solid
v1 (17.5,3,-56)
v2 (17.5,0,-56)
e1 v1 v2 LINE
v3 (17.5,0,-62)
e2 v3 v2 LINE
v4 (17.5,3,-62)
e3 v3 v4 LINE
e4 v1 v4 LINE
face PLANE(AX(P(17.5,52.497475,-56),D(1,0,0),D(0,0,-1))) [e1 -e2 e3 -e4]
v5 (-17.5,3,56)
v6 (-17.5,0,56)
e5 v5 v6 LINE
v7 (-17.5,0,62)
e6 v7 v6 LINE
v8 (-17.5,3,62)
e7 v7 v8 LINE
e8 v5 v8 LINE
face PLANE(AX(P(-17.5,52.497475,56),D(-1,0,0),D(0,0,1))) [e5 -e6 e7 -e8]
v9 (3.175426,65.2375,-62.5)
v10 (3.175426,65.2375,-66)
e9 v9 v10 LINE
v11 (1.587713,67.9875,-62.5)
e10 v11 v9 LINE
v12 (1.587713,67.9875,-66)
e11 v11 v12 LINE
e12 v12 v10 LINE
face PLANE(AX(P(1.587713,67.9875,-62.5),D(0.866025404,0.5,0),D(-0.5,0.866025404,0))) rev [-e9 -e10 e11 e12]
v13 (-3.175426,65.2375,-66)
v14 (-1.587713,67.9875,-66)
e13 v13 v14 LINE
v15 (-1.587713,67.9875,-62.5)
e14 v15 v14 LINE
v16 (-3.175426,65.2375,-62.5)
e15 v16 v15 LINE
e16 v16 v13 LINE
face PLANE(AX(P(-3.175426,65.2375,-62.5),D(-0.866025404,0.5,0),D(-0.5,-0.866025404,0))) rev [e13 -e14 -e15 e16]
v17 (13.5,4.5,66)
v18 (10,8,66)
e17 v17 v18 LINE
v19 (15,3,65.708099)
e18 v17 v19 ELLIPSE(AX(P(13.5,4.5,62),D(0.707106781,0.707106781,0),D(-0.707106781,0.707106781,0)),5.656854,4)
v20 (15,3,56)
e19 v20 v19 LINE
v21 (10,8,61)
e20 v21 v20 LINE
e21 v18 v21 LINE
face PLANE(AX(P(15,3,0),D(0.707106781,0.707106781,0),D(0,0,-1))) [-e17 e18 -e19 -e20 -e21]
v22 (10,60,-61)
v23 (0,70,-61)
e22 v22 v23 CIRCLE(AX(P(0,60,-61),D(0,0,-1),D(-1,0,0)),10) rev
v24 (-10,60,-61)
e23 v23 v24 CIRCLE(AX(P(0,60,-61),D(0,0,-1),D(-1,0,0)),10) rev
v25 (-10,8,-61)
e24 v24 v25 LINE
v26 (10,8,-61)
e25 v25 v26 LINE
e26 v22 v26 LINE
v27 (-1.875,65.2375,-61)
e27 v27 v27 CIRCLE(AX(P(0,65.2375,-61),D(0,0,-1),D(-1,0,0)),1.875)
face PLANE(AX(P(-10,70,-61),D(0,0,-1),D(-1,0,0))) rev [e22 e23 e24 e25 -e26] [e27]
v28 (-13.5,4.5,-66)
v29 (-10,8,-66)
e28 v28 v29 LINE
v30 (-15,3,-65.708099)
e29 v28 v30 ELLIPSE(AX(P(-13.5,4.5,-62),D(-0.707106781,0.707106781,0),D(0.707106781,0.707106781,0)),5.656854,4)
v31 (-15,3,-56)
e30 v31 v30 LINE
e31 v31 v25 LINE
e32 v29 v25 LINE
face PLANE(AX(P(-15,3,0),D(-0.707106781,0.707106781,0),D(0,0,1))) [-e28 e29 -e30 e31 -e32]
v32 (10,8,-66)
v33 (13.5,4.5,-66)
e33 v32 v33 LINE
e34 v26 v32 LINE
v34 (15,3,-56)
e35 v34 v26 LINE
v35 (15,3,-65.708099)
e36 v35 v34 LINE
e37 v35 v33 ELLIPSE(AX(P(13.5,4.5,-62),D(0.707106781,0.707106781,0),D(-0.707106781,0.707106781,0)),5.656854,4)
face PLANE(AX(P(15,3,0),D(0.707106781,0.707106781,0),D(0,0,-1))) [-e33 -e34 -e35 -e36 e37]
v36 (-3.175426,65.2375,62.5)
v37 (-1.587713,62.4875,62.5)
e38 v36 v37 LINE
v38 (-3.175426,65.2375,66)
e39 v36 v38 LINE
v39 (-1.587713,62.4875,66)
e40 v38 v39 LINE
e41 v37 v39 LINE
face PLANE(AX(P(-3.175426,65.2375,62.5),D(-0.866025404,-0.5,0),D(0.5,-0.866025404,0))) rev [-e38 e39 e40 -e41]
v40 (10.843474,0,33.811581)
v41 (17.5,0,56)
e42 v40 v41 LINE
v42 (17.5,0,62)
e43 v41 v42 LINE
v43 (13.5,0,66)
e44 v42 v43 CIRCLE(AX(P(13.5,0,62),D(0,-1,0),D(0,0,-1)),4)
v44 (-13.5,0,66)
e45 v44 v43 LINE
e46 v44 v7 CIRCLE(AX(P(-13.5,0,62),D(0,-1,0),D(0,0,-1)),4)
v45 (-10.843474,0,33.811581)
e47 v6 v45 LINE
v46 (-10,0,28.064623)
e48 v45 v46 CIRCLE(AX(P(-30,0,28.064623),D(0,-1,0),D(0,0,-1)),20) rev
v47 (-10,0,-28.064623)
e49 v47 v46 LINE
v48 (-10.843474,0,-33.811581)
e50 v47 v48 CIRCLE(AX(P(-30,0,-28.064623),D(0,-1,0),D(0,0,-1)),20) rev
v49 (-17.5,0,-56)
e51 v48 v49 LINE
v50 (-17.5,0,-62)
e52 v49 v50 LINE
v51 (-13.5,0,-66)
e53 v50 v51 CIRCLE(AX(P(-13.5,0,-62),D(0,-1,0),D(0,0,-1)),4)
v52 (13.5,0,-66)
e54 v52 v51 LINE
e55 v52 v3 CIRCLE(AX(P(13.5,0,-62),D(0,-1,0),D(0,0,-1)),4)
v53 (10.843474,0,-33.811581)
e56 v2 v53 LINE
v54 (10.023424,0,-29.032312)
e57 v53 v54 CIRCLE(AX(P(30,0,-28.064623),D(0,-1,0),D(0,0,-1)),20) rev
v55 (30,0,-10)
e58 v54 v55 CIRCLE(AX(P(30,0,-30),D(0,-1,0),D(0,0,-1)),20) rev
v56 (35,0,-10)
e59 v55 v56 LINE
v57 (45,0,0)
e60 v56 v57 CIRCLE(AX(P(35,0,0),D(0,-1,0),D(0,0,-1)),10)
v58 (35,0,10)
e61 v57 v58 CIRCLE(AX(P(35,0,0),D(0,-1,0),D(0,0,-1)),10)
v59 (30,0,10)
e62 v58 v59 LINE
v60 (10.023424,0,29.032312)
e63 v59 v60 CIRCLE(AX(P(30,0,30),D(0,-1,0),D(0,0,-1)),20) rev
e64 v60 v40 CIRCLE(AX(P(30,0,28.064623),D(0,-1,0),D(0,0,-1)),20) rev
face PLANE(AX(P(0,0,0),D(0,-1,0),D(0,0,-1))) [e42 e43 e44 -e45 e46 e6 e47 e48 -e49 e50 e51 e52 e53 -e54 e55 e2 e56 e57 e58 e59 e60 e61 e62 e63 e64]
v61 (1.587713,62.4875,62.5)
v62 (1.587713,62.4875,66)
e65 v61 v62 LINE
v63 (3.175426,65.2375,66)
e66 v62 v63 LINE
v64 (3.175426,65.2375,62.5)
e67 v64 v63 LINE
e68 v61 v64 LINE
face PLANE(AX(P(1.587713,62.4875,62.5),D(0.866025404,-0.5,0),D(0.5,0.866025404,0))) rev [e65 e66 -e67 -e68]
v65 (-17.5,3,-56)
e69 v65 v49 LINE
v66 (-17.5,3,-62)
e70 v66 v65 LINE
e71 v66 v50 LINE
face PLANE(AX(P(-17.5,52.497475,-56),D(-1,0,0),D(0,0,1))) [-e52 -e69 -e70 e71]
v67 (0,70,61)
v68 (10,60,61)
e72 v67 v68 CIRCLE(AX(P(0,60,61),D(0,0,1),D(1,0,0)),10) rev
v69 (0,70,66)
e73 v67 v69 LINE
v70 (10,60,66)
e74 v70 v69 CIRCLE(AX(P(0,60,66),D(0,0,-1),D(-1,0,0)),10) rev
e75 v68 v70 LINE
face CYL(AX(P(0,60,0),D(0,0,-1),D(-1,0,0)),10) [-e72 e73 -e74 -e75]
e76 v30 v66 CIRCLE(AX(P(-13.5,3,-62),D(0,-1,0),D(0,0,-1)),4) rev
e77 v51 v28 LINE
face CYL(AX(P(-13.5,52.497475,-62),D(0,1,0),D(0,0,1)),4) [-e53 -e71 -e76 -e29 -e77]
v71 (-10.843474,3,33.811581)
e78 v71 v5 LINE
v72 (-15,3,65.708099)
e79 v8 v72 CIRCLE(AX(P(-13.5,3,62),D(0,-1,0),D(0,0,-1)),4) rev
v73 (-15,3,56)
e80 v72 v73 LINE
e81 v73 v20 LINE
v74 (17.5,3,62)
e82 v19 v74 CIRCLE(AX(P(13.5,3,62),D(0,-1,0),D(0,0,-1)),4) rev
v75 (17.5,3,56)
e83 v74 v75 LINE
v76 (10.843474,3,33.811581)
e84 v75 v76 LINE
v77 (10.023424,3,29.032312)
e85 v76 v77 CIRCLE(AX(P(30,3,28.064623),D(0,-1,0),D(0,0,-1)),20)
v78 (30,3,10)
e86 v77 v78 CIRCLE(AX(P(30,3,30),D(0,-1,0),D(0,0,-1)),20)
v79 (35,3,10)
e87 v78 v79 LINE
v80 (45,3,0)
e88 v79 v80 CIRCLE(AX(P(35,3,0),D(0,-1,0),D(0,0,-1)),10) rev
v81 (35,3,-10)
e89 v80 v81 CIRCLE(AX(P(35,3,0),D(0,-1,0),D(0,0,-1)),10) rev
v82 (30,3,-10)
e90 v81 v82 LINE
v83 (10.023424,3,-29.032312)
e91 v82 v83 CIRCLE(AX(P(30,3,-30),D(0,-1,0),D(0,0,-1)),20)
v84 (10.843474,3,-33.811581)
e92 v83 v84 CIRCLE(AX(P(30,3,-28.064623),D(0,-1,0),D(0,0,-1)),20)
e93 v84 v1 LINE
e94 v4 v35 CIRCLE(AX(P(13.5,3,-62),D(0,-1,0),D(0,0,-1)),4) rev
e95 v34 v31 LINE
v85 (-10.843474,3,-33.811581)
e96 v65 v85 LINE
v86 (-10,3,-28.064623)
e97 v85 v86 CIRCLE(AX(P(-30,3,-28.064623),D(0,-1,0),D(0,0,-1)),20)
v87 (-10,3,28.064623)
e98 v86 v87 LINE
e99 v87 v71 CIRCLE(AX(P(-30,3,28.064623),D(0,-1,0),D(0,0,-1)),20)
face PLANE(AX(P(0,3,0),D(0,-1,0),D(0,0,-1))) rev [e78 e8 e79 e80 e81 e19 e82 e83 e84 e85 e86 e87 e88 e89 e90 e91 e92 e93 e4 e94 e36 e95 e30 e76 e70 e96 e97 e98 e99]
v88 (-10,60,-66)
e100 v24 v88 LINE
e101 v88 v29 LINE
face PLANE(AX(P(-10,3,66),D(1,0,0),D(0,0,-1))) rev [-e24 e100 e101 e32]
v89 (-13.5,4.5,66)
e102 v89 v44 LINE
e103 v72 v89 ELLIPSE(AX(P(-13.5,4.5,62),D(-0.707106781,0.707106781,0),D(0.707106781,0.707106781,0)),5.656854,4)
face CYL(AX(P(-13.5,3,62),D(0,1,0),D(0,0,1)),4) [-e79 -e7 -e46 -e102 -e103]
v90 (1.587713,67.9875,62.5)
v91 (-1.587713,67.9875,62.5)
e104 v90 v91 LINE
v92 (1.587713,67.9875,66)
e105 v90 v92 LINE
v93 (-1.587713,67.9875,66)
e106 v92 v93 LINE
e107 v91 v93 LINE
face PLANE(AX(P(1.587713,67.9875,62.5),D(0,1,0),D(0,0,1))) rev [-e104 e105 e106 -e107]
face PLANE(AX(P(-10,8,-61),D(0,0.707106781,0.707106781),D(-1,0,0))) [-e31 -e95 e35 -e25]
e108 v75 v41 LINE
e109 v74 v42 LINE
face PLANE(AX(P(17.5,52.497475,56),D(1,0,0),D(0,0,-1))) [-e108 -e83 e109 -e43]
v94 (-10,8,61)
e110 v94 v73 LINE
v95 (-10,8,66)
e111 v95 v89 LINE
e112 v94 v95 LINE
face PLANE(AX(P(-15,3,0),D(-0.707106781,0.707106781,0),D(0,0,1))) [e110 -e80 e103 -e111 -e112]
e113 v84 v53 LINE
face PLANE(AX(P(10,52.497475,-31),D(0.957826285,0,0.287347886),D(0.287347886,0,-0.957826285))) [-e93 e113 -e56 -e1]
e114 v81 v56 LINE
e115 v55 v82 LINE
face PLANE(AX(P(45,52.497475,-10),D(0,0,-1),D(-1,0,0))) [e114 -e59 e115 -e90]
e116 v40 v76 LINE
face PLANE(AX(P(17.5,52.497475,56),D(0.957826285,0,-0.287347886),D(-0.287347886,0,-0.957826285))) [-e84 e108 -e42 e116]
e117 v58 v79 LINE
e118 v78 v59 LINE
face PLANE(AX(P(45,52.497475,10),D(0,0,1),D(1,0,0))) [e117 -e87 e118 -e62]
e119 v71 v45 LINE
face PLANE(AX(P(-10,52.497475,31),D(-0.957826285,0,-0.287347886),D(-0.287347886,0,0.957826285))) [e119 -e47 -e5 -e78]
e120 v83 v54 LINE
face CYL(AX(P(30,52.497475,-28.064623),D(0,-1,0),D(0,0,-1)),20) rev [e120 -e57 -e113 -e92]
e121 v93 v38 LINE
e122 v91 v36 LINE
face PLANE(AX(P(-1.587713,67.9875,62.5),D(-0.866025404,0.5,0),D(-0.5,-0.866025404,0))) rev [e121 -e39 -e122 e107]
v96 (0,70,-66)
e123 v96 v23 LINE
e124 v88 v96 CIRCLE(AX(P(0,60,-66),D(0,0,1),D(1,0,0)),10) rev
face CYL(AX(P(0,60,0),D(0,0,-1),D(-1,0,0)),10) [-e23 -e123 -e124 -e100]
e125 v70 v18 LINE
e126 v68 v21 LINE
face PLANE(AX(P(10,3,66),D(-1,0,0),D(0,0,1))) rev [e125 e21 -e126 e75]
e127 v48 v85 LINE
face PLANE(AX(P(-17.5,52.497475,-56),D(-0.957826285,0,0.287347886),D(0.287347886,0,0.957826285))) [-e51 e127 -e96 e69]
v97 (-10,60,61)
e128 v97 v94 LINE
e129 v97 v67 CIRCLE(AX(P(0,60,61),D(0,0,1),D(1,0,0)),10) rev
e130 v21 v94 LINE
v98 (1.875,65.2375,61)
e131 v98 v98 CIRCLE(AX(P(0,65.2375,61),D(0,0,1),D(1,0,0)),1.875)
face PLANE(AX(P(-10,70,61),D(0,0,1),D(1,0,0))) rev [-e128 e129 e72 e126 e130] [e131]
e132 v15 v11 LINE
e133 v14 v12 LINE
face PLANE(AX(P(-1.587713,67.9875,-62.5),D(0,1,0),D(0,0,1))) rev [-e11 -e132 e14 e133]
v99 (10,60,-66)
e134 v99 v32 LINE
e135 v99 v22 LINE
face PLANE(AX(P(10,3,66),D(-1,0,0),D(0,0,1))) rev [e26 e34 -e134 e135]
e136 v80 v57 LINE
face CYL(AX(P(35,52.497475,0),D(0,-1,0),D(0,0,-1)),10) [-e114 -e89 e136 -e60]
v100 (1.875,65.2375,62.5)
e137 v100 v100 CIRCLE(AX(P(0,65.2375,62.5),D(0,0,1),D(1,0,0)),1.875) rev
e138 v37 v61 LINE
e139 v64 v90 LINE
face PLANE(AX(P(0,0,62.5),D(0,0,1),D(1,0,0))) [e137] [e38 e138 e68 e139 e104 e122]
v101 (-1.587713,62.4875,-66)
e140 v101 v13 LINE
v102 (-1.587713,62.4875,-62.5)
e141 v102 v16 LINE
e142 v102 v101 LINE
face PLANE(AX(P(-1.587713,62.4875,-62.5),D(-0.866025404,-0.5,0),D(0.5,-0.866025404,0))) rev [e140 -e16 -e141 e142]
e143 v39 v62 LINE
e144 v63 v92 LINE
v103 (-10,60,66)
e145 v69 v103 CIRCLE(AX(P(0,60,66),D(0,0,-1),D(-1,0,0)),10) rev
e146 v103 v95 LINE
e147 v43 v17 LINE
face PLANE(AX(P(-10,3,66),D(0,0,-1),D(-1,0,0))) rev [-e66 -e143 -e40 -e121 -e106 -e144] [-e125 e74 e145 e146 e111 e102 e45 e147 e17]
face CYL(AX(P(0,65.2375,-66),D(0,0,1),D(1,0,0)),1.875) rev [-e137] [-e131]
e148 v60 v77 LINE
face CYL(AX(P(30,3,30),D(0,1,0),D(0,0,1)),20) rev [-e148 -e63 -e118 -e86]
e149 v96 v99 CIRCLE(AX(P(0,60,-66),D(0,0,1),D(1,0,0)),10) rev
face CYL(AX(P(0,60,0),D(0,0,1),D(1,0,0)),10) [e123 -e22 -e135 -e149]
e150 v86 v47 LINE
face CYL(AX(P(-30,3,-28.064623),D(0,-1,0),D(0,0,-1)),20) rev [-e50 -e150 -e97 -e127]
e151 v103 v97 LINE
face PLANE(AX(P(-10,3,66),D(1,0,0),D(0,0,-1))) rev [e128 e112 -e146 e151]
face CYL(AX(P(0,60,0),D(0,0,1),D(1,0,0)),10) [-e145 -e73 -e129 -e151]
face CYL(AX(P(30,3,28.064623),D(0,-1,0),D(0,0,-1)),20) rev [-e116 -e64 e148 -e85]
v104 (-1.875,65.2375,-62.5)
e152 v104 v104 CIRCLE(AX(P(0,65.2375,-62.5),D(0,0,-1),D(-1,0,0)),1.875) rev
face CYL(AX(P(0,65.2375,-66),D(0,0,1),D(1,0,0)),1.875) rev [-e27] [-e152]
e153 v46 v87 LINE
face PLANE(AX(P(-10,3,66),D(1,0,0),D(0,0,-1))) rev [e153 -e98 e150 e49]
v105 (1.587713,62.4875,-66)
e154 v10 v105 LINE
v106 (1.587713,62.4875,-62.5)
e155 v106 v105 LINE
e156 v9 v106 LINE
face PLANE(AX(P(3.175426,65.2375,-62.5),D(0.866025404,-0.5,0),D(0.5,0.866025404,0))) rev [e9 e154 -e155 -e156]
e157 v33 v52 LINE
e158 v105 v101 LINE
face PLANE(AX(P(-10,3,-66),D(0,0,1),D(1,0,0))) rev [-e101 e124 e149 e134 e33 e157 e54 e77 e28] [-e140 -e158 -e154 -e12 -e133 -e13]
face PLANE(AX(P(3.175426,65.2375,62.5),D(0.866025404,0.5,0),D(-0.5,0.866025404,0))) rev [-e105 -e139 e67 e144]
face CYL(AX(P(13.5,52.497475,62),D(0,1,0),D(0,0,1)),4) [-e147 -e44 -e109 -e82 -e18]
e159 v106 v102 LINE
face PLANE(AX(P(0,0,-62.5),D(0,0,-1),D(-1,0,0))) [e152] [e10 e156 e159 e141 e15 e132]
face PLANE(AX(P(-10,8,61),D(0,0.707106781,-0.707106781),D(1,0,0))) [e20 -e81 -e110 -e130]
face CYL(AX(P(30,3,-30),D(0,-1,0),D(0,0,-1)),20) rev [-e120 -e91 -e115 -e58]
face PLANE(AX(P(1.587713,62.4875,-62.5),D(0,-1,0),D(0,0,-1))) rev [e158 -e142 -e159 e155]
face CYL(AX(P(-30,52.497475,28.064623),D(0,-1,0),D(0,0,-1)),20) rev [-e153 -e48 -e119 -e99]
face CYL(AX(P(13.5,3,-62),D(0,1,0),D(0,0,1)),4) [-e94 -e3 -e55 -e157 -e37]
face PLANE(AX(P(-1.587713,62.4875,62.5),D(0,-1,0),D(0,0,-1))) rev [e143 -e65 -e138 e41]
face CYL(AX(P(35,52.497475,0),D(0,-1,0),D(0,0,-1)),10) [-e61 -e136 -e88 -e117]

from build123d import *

# Parameters (mm, degrees)
SKETCH1_W           = 20
SKETCH1_H           = 132
BOSS_EXTRUDE1_DEPTH = 3
SKETCH2_W           = 20
SKETCH2_H           = 5
BOSS_EXTRUDE2_DEPTH = 67
SKETCH4_R           = 1.875
CUT_EXTRUDE1_DEPTH  = 150.746452379
FILLET3_R           = 10
CUT_EXTRUDE2_DEPTH  = 3.5
CUT_EXTRUDE3_DEPTH  = 3.5
SKETCH8_W           = 45
SKETCH8_H           = 20
BOSS_EXTRUDE3_DEPTH = 3
CHAMFER1_SIZE       = 5
FILLET4_R           = 10
FILLET5_R           = 4
FILLET6_R           = 20


# Some blends are built 0.0001 mm under size
with BuildPart() as part:
    # Sketch1 → Boss-Extrude1 (new body)
    with BuildSketch(Plane(origin=(0, 0, 0), x_dir=(1, 0, 0), z_dir=(0, 1, 0))):
        Rectangle(SKETCH1_W, SKETCH1_H)
    extrude(amount=BOSS_EXTRUDE1_DEPTH)

    # Sketch2 → Boss-Extrude2 (add)
    with BuildSketch(Plane(origin=(0, 3, 0), x_dir=(1, 0, 0), z_dir=(0, 1, 0))):
        with Locations((0, -63.5)):
            Rectangle(SKETCH2_W, SKETCH2_H)
        with Locations((0, 63.5)):
            Rectangle(SKETCH2_W, SKETCH2_H)
    extrude(amount=BOSS_EXTRUDE2_DEPTH)

    # Sketch4 → Cut-Extrude1 (cut, through all)
    with BuildSketch(Plane.XY.offset(66)):
        with Locations((0, 65.2375)):
            Circle(SKETCH4_R)
    extrude(amount=-CUT_EXTRUDE1_DEPTH, mode=Mode.SUBTRACT)

    # Fillet3
    fillet3_edges = [part.edges().sort_by_distance(p)[0] for p in [
        (10, 70, 63.5),
        (-10, 70, 63.5),
        (10, 70, -63.5),
        (-10, 70, -63.5),
    ]]
    fillet(fillet3_edges, radius=FILLET3_R - 0.0001)  # a hair under: the kernel refuses the full size

    # Sketch6 → Cut-Extrude2 (cut)
    with BuildSketch(Plane.XY.offset(66)):
        Polygon((3.175426481, 65.2375), (1.58771324, 67.9875), (-1.58771324, 67.9875), (-3.175426481, 65.2375), (-1.58771324, 62.4875), (1.58771324, 62.4875), align=None)
    extrude(amount=-CUT_EXTRUDE2_DEPTH, mode=Mode.SUBTRACT)

    # Sketch7 → Cut-Extrude3 (cut)
    with BuildSketch(Plane(origin=(0, 0, -66), x_dir=(-1, 0, 0), z_dir=(0, 0, -1))):
        Polygon((3.175426481, 65.2375), (1.58771324, 67.9875), (-1.58771324, 67.9875), (-3.175426481, 65.2375), (-1.58771324, 62.4875), (1.58771324, 62.4875), align=None)
    extrude(amount=-CUT_EXTRUDE3_DEPTH, mode=Mode.SUBTRACT)

    # Sketch8 → Boss-Extrude3 (add)
    with BuildSketch(Plane.XZ):
        Polygon((17.5, -56), (17.5, -66), (-17.5, -66), (-17.5, -56), (-10, -31), (10, -31), align=None)
        Polygon((17.5, 56), (17.5, 66), (-17.5, 66), (-17.5, 56), (-10, 31), (10, 31), align=None)
        with Locations((22.5, 0)):
            Rectangle(SKETCH8_W, SKETCH8_H)
    extrude(amount=-BOSS_EXTRUDE3_DEPTH)

    # Chamfer1
    chamfer1_edges = [part.edges().sort_by_distance(p)[0] for p in [
        (10, 3, -63.5),
        (-10, 3, -63.5),
        (10, 3, 63.5),
        (-10, 3, 63.5),
        (0, 3, 61),
        (0, 3, -61),
    ]]
    chamfer(chamfer1_edges, length=CHAMFER1_SIZE)

    # Fillet4
    fillet4_edges = [part.edges().sort_by_distance(p)[0] for p in [
        (45, 1.5, -10),
        (45, 1.5, 10),
    ]]
    fillet(fillet4_edges, radius=FILLET4_R - 0.0001)  # a hair under: the kernel refuses the full size

    # Fillet5
    fillet5_edges = [part.edges().sort_by_distance(p)[0] for p in [
        (17.5, 1.5, -66),
        (-17.5, 1.5, -66),
        (-17.5, 1.5, 66),
        (17.5, 1.5, 66),
    ]]
    fillet(fillet5_edges, radius=FILLET5_R)

    # Fillet6
    # the kernel refuses this fillet: 20 mm, written as the material it adds along each edge
    with BuildSketch(Plane(origin=(-10, 0, -31), x_dir=(-0.287347885566345, 0, -0.9578262852211515), z_dir=(0, 1, 0)), Plane(origin=(-10, 0, 31), x_dir=(0, 0, -1), z_dir=(0, 1, 0))) as fillet6_piece_1:
        with BuildLine():
            CenterArc((FILLET6_R * 0.146768836304, FILLET6_R), FILLET6_R, 253.300755766, 16.699244234)
            Line((-FILLET6_R * 0.140579049263, FILLET6_R * 0.0421737147788), (0, 0))
            Line((0, 0), (FILLET6_R * 0.146768836304, 0))
        make_face()
    extrude(amount=3)
    with BuildSketch(Plane(origin=(10, 0, 31), x_dir=(0, 0, -1), z_dir=(0, 1, 0)), Plane(origin=(10, 0, -31), x_dir=(0.287347885566345, 0, -0.9578262852211515), z_dir=(0, 1, 0))) as fillet6_piece_2:
        with BuildLine():
            CenterArc((FILLET6_R * 0.146768836304, -FILLET6_R), FILLET6_R, 90, 16.699244234)
            Line((-FILLET6_R * 0.140579049263, -FILLET6_R * 0.0421737147788), (0, 0))
            Line((0, 0), (FILLET6_R * 0.146768836304, 0))
        make_face()
    extrude(amount=3)
    with BuildSketch(Plane(origin=(10, 3, -10), x_dir=(0, 0, -1), z_dir=(0, -1, 0))) as fillet6_piece_3:
        with BuildLine():
            CenterArc((FILLET6_R, FILLET6_R), FILLET6_R, 180, 90)
            Line((0, FILLET6_R), (0, 0))
            Line((0, 0), (FILLET6_R, 0))
        make_face()
    extrude(amount=3)
    with BuildSketch(Plane(origin=(10, 0, 10), x_dir=(1, 0, 0), z_dir=(0, 1, 0))) as fillet6_piece_4:
        with BuildLine():
            CenterArc((FILLET6_R, -FILLET6_R), FILLET6_R, 90, 90)
            Line((0, -FILLET6_R), (0, 0))
            Line((0, 0), (FILLET6_R, 0))
        make_face()
    extrude(amount=3)


solid = part.part
